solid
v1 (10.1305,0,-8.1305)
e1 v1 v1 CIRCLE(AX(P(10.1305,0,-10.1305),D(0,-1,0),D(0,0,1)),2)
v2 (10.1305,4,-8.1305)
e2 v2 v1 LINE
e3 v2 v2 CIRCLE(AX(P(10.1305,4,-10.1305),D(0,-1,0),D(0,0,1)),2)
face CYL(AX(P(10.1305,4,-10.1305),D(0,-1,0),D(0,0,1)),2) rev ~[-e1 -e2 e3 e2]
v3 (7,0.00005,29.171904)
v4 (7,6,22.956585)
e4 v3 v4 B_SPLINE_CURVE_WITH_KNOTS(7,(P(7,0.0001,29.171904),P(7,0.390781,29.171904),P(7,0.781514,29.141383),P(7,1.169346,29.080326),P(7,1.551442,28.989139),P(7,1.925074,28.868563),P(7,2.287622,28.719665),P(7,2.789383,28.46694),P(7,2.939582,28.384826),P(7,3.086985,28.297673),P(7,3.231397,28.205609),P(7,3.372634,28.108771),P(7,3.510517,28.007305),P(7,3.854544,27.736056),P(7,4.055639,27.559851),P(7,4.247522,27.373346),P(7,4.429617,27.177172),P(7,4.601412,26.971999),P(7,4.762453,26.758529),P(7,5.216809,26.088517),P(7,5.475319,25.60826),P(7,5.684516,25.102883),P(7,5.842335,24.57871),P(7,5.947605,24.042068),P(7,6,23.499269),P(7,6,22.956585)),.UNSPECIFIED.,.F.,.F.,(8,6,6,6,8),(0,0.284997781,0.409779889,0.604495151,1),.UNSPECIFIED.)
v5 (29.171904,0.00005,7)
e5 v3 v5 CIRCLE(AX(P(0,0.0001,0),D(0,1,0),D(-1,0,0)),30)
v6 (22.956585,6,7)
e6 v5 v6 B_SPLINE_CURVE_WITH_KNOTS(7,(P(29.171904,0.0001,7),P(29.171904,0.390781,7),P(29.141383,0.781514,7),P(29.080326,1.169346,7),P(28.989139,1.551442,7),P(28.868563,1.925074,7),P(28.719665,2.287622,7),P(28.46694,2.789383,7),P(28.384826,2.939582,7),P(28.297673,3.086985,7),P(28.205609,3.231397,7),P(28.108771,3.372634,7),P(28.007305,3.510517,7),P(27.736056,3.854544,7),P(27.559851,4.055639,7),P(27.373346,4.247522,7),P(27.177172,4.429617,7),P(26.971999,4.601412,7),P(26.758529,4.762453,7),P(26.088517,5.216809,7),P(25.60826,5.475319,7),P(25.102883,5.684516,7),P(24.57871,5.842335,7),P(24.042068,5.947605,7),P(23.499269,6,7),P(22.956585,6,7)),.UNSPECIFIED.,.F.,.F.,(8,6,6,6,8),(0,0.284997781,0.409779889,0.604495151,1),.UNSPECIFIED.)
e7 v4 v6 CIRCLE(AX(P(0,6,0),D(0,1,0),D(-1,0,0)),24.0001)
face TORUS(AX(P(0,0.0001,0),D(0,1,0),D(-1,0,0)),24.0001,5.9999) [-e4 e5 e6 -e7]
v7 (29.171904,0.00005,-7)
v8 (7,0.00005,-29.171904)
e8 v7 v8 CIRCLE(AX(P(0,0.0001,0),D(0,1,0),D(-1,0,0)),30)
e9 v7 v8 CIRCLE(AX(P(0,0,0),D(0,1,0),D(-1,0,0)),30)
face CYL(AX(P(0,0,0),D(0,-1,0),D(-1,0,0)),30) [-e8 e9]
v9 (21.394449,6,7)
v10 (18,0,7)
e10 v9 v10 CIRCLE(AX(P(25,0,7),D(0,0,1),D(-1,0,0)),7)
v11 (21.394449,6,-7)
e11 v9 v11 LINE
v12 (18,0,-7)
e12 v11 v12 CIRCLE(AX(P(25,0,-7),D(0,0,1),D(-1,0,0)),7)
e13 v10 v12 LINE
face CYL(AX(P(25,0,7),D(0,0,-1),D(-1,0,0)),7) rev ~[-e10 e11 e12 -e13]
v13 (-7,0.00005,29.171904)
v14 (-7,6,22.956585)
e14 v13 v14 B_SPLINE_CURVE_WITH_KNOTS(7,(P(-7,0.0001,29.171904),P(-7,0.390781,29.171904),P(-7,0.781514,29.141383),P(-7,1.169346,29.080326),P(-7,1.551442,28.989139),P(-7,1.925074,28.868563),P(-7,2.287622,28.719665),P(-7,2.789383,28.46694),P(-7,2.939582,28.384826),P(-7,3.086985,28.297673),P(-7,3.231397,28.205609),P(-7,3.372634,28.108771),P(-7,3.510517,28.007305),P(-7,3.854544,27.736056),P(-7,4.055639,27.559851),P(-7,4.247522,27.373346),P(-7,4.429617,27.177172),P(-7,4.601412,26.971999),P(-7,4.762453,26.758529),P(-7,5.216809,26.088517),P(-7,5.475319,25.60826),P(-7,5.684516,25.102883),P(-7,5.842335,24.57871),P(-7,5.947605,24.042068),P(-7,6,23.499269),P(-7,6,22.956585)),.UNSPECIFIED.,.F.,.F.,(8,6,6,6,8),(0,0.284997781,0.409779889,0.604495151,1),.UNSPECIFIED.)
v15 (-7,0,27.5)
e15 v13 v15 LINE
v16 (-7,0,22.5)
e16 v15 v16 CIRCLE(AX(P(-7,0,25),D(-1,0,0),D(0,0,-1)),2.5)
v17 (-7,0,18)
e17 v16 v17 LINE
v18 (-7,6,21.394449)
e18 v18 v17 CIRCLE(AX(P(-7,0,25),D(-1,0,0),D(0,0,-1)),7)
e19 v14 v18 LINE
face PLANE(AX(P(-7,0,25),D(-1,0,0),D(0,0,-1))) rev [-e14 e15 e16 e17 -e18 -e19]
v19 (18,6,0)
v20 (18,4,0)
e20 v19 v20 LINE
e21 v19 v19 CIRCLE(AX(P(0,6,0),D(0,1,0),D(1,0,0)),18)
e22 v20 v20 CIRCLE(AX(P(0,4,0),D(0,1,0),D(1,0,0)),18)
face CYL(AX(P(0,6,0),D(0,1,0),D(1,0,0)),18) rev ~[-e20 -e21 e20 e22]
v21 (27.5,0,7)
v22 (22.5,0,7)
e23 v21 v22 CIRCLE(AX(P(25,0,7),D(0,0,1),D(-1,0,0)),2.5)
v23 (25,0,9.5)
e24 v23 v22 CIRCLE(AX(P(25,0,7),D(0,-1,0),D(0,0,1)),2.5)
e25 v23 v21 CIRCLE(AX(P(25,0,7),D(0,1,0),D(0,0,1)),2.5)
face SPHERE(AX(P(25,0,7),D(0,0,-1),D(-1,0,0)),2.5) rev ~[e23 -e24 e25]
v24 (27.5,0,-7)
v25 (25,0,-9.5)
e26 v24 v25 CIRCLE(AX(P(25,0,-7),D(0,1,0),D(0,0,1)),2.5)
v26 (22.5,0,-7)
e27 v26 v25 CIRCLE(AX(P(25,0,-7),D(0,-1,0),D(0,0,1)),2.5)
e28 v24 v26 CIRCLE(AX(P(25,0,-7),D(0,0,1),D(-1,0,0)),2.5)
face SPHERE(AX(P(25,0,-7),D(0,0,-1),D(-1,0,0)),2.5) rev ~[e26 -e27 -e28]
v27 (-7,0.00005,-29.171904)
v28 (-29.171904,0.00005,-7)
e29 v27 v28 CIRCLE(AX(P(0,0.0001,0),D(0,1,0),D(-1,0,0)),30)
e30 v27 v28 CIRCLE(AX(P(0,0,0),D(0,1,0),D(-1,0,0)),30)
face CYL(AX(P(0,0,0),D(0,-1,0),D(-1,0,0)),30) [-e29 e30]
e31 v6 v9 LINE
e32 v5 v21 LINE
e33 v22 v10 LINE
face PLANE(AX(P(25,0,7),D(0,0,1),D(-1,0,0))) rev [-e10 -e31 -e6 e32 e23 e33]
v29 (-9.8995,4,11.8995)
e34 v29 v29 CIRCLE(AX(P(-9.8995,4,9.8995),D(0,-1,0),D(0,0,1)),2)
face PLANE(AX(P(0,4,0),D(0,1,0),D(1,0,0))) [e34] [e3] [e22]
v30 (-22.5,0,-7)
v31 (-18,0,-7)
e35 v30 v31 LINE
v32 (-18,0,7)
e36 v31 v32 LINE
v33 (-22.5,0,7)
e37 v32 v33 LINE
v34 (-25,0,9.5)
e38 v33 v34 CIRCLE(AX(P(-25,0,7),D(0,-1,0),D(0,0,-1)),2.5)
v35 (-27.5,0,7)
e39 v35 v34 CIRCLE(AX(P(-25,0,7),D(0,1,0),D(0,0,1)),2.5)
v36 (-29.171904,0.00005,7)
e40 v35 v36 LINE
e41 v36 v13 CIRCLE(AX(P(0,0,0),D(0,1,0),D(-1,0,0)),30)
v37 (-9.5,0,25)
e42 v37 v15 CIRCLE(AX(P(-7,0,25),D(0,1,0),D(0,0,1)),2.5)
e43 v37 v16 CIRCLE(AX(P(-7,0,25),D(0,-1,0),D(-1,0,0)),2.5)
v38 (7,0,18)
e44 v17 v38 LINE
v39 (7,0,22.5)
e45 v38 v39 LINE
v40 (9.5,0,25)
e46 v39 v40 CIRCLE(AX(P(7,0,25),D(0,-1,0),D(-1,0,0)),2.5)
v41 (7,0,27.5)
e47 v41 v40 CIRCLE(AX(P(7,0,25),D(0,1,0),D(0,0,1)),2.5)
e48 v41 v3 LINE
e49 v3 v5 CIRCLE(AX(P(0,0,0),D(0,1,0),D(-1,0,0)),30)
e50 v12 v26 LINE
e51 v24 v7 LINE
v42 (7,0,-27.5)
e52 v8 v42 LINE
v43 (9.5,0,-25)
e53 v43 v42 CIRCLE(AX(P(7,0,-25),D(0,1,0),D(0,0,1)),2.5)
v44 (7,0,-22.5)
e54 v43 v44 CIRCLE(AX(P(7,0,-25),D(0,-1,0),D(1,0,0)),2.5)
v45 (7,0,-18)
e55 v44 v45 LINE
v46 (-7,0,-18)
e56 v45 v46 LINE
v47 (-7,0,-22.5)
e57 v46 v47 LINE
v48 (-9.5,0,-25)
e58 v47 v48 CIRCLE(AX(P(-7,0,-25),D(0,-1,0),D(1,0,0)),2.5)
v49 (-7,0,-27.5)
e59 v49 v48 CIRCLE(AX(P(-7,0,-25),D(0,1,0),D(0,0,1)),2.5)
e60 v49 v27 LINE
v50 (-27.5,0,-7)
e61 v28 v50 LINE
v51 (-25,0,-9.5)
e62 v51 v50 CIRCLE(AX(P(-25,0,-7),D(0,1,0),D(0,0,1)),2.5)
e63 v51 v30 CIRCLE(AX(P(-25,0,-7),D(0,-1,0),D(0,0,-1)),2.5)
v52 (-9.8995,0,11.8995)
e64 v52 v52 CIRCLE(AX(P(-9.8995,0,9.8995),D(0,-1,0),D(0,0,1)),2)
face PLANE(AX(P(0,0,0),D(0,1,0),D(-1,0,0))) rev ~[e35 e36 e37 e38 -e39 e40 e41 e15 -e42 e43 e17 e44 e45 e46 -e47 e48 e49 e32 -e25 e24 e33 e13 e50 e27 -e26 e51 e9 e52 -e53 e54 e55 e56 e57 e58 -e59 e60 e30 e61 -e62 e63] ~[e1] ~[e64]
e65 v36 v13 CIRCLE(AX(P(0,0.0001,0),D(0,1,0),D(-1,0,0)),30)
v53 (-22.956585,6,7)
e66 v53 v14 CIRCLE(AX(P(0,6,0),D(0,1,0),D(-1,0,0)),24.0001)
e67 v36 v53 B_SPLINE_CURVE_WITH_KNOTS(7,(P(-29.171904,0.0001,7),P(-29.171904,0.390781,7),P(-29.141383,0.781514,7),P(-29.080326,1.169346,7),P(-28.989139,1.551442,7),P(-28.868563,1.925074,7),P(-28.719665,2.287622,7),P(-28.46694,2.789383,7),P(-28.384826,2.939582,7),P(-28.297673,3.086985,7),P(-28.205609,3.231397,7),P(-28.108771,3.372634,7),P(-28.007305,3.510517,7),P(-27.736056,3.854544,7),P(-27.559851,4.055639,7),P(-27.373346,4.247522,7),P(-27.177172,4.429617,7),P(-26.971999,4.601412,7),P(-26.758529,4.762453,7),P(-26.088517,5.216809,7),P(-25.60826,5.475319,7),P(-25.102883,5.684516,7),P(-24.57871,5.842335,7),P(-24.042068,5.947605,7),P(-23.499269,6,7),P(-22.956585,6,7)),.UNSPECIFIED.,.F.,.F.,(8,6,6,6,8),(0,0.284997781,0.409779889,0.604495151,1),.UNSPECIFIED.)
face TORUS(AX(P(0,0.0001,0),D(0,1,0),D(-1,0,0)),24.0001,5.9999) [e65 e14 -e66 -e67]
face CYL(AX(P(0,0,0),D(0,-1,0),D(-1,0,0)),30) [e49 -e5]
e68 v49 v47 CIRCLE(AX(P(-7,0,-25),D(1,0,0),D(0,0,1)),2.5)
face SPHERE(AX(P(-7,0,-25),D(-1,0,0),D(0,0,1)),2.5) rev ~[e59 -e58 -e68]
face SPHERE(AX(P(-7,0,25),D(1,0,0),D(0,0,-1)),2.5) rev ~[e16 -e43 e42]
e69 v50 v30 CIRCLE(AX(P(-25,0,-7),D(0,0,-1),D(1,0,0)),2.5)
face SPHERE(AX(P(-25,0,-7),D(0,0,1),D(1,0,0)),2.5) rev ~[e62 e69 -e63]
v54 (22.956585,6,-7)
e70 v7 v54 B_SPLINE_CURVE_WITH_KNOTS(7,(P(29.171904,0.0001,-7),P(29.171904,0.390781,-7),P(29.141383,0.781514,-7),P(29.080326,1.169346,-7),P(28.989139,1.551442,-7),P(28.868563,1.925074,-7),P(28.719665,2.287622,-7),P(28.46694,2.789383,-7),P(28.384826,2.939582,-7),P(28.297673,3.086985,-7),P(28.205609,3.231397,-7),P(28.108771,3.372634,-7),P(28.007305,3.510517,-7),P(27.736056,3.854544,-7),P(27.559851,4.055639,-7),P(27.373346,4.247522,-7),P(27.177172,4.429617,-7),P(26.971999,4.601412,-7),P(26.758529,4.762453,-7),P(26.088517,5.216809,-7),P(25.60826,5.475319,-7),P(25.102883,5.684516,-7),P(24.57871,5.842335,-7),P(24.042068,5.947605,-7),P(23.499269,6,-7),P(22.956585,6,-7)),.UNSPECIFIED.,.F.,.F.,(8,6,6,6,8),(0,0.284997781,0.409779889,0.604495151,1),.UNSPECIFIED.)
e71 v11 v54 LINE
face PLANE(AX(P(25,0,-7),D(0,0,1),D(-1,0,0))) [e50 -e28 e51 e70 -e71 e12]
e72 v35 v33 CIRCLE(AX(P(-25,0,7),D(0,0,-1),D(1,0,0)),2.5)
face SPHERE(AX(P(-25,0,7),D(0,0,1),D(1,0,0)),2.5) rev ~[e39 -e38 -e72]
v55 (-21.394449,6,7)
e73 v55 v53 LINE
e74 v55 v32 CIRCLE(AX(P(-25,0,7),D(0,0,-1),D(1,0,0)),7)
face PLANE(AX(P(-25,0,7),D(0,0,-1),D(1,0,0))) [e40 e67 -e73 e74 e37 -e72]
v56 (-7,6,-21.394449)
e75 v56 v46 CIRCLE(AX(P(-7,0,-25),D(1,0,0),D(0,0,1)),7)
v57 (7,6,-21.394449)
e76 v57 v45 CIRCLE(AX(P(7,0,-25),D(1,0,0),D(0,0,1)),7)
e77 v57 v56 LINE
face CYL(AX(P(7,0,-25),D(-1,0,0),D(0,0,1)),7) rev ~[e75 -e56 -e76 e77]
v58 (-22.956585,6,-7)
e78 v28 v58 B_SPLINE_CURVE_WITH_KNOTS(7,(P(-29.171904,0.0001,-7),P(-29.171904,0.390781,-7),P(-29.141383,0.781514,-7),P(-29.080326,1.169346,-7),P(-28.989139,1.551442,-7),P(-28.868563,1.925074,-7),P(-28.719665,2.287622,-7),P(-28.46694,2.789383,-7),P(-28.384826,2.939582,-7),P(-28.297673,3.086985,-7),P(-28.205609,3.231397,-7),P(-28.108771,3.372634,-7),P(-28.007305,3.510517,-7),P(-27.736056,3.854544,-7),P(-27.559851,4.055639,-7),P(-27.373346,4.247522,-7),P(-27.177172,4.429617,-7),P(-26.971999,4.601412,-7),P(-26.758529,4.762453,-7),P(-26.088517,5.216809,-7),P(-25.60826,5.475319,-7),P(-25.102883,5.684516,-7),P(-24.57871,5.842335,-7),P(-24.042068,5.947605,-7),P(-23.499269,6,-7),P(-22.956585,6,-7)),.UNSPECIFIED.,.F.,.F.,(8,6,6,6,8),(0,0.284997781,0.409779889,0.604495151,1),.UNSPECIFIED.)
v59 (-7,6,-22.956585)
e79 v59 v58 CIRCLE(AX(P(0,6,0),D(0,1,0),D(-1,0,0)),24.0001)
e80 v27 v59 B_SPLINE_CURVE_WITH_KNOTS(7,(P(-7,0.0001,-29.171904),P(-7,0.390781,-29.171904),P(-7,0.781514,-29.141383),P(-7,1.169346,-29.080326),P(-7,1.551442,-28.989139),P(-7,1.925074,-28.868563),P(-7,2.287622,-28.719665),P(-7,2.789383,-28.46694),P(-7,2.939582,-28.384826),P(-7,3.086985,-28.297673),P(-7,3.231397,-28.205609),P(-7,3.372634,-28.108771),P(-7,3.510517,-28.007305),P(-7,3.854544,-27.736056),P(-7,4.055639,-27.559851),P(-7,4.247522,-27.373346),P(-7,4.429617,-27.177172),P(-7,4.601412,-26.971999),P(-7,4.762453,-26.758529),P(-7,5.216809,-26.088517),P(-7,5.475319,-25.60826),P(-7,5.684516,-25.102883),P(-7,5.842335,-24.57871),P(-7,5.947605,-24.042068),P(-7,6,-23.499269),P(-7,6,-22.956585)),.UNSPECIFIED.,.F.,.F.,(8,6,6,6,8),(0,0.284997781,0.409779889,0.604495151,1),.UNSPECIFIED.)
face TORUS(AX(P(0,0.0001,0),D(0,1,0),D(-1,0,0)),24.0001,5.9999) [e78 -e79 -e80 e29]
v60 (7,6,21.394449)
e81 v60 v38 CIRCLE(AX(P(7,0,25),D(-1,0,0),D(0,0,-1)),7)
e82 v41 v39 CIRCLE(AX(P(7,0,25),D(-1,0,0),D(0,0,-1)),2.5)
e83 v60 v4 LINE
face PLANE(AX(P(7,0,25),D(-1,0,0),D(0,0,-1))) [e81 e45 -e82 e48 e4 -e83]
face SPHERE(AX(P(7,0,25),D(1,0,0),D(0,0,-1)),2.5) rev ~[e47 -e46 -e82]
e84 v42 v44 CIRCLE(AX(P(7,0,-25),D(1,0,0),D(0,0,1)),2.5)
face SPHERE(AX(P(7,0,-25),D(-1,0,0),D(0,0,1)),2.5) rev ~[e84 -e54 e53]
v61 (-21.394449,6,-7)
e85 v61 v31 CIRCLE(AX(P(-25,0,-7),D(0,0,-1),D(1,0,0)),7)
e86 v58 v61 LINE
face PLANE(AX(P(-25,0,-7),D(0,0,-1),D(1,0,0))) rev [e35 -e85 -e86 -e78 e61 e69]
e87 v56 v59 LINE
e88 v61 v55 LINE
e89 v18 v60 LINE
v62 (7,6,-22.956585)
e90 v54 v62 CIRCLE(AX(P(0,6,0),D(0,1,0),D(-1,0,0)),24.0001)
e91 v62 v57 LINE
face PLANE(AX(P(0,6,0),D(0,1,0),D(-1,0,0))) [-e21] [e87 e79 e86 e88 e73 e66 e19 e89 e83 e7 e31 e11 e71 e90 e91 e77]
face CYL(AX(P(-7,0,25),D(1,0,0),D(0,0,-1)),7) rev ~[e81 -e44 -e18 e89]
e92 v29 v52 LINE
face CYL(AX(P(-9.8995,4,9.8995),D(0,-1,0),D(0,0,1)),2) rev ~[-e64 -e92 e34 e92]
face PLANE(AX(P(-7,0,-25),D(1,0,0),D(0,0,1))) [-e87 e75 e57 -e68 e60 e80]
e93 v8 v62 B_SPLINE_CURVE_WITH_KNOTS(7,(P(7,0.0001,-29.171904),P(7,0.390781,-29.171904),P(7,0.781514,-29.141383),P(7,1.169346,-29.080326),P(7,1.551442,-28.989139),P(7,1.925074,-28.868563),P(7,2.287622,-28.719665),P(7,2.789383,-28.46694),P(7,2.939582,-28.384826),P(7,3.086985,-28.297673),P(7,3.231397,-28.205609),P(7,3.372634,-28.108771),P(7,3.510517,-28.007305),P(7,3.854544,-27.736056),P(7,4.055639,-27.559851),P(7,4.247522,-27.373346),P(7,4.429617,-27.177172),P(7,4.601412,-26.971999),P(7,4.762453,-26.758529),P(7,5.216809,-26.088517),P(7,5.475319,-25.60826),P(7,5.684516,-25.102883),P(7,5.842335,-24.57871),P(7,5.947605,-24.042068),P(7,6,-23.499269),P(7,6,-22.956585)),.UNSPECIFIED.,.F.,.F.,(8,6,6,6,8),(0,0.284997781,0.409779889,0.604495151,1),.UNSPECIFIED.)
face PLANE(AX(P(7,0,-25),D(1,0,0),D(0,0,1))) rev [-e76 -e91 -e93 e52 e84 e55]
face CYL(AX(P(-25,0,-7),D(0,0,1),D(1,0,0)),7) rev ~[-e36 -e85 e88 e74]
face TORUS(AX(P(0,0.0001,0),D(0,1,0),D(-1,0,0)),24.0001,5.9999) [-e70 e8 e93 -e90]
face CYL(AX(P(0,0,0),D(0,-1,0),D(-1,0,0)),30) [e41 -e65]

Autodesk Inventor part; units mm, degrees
ref_plane "YZ Plane" through (0, 0, 0) normal (1, 0, 0) x (0, 1, 0)
ref_plane "XZ Plane" through (0, 0, 0) normal (0, 1, 0) x (-1, 0, 0)
ref_plane "XY Plane" through (0, 0, 0) normal (0, 0, 1) x (1, 0, 0)
sketch "Sketch1" plane through (0, 0, 0) normal (0, 1, 0) x (-1, 0, 0)
  circle A0 centre (0, 0) radius 30
  dimension "d0" = 60
extrude "Extrusion1" add sketch "Sketch1" along normal blind 6
fillet "Fillet1" radius 6 1 edges at (30, 6, 0)
sketch "Sketch2" plane through (0, 0, 0) normal (0, -1, 0) x (1, 0, 0)
  line L0 (-7, -25) -> (7, -25)
  line L1 (7, -25) -> (7, -18)
  line L2 (7, -18) -> (-7, -18)
  line L3 (-7, -18) -> (-7, -25)
  line L4 (-7, -25) -> (7, -18) construction
  line L5 (7, -25) -> (-7, -18) construction
  arc A0 (-4.5, -25) -> (-9.5, -25) centre (-7, -25) ccw
  arc A1 (9.5, -25) -> (4.5, -25) centre (7, -25) ccw
  line L6 (-9.5, -25) -> (9.5, -25)
  point P0 (0, 0)
  point P1 (0, -21.5)
  dimension "d4" = 14
  dimension "d5" = 7
  dimension "d6" = 18
  dimension "d7" = 5
  dimension "d8" = 5
revolve "Revolution1" cut sketch "Sketch2" angle 360 about axis through (-7, 0, -25) along (1, 0, 0)
pattern_circular "Circular Pattern1" count 4 over 360 about axis through (0, -10, 0) along (0, 1, 0) of "Revolution1"
sketch "Sketch3" plane through (0, 6, 0) normal (0, 1, 0) x (1, 0, 0)
  circle A0 centre (0, 0) radius 18
  dimension "d13" = 36
extrude "Extrusion2" cut sketch "Sketch3" against normal blind 2
sketch "Sketch4" plane through (0, 4, 0) normal (0, 1, 0) x (1, 0, 0)
  line L0 (0, 0) -> (0, -8.2559)
  line L1 (0, 0) -> (-9.8995, -9.8995)
  line L2 (0, 0) -> (9.8995, 9.8995)
  point P0 (10.1305, 10.1305)
  dimension "d16" = 45
  dimension "d17" = 14
  dimension "d18" = 14
hole "Hole1" at (-9.8995, 4, 9.8995) at (10.1305, 4, -10.1305) direction (0, -1, 0) diameter 4 end through all
properties part number "omni_wheel_cover_in"
